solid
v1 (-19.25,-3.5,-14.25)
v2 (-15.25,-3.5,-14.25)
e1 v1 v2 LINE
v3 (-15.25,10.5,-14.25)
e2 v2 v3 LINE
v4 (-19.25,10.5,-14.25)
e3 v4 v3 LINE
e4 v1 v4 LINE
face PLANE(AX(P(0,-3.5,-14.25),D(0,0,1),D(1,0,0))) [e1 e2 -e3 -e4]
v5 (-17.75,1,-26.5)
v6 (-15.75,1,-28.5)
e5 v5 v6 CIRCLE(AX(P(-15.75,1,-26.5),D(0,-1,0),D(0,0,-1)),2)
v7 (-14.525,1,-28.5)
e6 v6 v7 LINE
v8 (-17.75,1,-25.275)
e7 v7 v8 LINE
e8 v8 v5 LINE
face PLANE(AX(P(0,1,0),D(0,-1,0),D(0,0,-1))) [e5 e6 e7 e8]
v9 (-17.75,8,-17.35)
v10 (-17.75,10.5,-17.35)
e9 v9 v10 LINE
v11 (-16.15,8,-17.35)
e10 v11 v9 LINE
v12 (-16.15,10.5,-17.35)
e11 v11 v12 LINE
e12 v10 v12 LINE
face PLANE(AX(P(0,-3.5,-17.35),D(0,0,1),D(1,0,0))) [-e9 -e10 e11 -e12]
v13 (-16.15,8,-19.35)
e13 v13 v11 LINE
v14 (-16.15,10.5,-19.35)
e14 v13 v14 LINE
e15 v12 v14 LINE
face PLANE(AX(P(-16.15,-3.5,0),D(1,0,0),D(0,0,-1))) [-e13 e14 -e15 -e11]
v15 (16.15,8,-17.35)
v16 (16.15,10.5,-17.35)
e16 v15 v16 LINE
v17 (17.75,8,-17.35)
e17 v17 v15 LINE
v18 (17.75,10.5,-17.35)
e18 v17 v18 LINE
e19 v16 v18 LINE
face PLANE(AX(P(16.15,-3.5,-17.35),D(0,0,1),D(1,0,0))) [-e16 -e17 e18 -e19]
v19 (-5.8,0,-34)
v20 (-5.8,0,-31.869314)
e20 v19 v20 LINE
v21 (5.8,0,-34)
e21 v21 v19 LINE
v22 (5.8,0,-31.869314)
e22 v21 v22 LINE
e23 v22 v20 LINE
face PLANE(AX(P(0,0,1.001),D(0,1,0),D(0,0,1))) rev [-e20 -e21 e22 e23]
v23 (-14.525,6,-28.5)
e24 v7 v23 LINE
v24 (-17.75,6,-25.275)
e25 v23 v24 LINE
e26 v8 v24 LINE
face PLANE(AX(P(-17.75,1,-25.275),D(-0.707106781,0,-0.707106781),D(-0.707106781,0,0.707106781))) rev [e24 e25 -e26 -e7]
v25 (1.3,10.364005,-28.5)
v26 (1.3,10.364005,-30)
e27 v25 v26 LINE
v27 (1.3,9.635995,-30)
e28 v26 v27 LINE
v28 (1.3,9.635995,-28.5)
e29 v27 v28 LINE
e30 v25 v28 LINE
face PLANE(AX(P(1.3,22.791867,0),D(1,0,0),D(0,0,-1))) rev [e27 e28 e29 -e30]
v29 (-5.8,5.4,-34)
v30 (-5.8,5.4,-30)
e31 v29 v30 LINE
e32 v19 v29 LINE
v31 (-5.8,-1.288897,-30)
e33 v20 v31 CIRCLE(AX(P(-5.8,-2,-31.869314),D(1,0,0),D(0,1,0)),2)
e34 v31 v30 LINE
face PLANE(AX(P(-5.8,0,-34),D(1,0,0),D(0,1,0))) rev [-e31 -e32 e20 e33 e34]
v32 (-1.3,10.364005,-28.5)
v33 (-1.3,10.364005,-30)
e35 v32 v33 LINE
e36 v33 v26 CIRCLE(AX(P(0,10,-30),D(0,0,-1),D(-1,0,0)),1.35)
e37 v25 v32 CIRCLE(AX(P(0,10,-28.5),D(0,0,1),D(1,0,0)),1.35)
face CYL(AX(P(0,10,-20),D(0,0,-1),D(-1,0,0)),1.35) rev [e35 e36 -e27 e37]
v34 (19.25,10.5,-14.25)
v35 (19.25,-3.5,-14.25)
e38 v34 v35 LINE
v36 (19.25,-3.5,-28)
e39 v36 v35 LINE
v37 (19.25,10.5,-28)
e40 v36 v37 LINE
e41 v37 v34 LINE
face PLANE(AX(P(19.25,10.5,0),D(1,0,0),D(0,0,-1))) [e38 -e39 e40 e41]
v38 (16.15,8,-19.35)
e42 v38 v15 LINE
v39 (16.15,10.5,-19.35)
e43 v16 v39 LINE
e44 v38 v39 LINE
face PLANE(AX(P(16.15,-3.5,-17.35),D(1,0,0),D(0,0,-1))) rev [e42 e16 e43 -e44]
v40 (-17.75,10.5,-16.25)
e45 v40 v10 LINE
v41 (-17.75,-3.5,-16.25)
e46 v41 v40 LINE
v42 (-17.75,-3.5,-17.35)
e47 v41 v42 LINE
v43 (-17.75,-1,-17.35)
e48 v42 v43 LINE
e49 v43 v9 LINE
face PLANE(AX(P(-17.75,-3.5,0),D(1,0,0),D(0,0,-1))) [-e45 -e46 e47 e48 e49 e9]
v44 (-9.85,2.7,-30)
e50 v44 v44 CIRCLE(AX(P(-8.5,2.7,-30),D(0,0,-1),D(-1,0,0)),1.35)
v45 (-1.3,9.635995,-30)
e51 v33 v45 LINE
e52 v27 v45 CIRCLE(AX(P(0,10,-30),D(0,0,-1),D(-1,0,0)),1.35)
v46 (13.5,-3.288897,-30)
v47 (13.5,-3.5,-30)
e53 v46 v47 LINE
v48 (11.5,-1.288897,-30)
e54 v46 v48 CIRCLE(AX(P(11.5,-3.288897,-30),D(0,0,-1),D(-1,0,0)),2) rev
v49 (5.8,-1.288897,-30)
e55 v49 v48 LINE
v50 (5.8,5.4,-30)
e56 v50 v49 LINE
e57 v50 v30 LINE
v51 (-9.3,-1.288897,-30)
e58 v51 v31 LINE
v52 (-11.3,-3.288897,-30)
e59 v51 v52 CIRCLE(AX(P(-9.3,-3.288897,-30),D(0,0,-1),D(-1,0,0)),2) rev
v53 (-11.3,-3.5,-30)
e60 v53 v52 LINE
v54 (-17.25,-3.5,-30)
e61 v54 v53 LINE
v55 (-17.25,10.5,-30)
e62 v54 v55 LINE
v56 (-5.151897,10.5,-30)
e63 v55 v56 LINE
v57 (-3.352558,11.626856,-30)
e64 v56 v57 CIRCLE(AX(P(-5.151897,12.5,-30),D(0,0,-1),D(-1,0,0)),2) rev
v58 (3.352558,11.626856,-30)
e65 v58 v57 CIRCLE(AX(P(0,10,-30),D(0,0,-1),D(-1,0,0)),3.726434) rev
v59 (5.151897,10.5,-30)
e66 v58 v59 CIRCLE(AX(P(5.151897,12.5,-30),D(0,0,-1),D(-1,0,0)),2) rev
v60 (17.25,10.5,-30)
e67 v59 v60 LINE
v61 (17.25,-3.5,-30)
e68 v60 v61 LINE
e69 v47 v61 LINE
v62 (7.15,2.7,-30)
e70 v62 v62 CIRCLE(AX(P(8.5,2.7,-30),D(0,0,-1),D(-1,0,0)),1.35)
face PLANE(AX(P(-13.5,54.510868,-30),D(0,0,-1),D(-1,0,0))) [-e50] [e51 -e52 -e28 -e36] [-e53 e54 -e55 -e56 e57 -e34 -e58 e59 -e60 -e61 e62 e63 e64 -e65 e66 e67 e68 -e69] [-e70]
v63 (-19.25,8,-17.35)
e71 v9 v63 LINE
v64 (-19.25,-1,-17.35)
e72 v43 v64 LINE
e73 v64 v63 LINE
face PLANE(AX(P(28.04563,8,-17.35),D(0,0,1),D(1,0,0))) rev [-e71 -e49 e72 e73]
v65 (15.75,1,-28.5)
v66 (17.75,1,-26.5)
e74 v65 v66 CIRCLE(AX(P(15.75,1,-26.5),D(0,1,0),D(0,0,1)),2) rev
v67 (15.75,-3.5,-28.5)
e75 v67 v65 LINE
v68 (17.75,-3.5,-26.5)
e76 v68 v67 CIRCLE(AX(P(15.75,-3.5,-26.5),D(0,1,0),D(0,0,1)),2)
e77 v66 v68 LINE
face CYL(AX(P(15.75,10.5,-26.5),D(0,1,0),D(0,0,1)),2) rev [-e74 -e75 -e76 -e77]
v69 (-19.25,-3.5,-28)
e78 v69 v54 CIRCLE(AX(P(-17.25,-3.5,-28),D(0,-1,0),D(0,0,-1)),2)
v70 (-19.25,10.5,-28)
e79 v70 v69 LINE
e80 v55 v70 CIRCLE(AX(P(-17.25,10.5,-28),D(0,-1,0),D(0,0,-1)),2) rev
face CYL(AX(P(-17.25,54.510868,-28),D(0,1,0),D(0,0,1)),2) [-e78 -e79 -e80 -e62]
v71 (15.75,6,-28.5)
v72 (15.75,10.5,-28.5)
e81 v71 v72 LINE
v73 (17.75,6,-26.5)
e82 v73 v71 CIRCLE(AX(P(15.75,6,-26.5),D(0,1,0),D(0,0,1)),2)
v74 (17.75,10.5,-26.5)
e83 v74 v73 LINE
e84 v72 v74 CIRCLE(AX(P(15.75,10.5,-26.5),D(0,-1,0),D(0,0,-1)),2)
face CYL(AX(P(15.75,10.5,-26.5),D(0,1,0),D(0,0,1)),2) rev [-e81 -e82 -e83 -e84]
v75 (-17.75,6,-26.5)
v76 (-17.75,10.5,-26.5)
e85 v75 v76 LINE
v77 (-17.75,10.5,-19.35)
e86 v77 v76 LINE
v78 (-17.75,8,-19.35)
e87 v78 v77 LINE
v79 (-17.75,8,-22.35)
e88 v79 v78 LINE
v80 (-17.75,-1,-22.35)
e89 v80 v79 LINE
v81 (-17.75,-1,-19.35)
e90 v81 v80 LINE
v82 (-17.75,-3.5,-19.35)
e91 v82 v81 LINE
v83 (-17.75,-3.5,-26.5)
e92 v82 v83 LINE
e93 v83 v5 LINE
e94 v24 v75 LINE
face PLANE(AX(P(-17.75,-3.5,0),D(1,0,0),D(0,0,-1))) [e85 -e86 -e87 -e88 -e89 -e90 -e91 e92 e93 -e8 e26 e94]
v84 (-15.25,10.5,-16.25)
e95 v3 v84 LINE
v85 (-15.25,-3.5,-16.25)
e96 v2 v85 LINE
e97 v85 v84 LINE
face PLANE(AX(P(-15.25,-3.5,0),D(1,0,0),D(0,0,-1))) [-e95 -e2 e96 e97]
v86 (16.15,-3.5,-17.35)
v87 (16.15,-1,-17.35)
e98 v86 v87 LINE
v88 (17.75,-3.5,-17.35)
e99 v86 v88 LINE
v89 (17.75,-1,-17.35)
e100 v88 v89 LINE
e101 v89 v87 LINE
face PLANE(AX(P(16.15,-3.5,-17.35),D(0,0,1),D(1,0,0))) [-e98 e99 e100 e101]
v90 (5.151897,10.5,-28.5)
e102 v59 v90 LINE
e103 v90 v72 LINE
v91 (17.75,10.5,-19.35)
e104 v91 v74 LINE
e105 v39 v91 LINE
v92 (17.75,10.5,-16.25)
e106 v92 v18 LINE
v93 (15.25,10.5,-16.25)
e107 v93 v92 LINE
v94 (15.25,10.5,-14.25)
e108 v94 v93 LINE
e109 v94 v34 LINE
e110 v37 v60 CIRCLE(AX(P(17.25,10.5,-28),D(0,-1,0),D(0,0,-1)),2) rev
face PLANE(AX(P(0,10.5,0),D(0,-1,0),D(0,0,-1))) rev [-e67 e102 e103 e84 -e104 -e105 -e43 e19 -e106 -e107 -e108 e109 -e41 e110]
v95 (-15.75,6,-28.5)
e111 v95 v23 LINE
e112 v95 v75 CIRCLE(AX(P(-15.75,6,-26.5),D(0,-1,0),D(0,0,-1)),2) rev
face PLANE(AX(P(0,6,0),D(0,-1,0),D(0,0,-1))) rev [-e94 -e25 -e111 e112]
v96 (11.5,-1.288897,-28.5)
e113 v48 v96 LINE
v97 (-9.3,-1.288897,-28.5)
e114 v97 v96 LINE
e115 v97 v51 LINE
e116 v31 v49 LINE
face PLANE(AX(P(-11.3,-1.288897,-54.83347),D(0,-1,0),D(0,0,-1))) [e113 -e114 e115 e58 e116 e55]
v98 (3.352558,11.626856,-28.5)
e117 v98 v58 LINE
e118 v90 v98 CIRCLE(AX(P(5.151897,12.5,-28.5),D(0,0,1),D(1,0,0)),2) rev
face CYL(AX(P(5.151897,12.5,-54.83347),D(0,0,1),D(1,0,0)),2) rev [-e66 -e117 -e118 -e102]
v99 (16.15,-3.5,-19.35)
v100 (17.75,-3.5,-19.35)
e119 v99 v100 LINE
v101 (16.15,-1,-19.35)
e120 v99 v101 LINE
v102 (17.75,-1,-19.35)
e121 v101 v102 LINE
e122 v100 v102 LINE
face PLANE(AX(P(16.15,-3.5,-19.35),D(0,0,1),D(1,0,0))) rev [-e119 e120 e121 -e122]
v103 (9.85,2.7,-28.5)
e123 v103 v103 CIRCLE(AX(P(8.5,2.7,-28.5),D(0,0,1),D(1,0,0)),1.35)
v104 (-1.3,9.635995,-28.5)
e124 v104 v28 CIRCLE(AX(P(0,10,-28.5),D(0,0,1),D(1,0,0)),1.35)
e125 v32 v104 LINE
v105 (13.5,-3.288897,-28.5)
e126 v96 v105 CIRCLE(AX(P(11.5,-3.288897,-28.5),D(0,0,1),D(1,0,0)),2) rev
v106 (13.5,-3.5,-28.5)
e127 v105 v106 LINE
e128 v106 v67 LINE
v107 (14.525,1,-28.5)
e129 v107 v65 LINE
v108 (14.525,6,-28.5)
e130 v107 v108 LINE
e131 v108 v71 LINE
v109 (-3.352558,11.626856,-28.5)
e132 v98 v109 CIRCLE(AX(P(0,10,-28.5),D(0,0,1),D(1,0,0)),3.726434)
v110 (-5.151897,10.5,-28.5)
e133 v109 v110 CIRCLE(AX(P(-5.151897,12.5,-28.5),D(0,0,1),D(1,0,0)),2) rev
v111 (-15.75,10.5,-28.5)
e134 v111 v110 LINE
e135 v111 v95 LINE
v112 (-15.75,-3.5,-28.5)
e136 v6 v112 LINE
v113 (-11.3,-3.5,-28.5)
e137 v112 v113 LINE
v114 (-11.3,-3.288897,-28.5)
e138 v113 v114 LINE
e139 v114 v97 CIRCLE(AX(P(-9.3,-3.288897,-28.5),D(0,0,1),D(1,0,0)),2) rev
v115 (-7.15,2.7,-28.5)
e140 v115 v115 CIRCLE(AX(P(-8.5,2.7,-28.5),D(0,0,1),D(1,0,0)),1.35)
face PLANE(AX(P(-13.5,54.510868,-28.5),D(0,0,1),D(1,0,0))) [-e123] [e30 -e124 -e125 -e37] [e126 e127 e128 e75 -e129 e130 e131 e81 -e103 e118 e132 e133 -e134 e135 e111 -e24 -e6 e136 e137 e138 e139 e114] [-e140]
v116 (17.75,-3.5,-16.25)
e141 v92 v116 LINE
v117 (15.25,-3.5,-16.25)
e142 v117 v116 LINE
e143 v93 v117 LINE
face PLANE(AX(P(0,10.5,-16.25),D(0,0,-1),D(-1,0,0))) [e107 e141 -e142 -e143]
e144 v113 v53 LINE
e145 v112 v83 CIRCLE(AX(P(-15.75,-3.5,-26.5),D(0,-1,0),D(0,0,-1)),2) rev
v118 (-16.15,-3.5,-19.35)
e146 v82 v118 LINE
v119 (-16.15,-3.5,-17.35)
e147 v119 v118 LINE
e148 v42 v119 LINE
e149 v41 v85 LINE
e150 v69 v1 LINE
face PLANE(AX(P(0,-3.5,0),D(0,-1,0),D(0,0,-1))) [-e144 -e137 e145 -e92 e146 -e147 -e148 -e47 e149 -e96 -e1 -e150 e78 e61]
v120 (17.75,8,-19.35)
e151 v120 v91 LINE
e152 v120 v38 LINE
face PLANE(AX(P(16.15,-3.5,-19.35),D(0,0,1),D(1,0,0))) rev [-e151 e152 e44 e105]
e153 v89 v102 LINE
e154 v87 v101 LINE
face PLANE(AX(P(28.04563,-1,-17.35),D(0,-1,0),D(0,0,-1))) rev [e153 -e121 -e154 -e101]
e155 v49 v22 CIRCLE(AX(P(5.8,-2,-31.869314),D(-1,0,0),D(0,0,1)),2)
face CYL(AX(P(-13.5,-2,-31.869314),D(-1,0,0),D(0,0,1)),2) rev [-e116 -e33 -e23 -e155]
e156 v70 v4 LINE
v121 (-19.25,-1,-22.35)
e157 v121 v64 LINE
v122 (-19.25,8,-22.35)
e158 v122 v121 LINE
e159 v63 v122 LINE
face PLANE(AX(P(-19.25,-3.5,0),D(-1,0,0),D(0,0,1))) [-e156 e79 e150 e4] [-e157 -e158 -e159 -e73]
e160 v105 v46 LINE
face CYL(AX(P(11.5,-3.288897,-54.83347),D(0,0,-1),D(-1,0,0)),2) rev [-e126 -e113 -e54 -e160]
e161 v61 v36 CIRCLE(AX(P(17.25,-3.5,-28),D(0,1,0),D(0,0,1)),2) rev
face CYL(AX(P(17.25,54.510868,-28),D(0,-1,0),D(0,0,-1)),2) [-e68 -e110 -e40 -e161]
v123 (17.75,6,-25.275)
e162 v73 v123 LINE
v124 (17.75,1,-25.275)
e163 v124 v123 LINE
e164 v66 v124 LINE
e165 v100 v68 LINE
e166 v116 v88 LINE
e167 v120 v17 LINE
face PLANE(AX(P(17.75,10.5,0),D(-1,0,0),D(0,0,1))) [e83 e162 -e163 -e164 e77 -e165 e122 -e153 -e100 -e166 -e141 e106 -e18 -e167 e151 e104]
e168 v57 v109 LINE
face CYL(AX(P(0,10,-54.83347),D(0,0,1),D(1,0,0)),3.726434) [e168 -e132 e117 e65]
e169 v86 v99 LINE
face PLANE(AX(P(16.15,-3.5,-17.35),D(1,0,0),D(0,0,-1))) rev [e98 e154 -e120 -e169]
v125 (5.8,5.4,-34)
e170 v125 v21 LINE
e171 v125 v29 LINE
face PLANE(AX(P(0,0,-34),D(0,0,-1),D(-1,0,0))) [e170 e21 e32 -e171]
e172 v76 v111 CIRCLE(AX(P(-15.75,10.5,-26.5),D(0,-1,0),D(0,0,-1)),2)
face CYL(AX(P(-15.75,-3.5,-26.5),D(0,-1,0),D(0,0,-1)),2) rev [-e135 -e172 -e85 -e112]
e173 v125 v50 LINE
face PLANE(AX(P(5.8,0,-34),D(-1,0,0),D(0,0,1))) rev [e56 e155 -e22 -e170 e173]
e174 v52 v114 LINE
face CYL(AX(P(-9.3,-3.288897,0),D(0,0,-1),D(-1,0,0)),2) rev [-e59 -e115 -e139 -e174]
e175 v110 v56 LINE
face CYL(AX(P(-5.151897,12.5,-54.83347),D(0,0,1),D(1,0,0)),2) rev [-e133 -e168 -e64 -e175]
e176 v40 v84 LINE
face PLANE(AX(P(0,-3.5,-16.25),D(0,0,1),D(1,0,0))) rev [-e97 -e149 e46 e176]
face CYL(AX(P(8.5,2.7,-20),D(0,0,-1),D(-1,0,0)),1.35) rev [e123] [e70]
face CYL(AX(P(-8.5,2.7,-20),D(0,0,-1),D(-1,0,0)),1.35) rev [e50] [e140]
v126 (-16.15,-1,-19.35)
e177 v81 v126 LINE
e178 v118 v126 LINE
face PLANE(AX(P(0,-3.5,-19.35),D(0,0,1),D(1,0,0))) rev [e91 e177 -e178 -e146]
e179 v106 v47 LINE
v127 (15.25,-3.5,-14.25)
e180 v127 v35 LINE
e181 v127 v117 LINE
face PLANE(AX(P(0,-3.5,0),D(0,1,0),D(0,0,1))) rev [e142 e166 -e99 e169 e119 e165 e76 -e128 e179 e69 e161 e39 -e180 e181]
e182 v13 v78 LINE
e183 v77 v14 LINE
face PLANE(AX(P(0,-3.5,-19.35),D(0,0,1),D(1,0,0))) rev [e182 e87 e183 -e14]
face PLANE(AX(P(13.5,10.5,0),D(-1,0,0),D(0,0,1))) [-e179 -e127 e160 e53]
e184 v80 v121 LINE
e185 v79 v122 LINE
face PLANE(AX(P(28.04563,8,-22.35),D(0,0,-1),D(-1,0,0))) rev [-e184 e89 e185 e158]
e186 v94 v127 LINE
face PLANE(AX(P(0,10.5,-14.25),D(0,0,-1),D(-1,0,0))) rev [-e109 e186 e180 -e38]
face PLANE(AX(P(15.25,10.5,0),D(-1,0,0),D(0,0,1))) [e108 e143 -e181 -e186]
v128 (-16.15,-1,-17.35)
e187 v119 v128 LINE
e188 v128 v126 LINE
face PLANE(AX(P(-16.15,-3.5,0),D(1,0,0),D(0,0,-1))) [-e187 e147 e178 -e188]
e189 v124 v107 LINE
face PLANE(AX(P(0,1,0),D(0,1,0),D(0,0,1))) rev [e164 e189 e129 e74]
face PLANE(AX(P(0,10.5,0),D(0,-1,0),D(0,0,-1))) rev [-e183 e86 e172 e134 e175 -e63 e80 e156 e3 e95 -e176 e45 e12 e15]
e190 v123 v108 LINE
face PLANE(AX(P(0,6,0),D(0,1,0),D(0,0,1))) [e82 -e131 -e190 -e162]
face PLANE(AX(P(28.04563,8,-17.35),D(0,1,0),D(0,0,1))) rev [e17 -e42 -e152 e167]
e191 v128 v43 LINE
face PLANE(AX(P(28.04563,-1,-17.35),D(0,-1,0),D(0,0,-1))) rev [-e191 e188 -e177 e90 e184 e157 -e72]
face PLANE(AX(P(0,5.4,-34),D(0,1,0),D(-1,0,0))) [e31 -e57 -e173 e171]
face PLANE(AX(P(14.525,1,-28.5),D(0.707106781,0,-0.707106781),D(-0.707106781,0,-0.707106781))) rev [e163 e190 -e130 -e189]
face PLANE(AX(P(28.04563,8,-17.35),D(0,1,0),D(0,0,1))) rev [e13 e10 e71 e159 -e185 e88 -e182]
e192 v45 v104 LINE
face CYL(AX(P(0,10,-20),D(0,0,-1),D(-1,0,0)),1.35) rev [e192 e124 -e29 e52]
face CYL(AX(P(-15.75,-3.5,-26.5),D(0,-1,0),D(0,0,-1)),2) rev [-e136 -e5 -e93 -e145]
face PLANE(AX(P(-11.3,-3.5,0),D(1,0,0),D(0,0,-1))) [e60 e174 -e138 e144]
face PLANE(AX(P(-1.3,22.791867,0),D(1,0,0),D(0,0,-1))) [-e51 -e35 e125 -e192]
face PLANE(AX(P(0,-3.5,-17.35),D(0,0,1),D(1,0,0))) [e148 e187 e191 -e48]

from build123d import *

# Parameters (mm, degrees)
SKETCH_1_W               = 27
SKETCH_1_H               = 17
EXTRUDE_1_DEPTH          = 1
SKETCH_2_R               = 2.55
CUT_EXTRUDE_1_DEPTH      = 16.984367363
EXTRUDE_2_DEPTH          = 17
SKETCH_6_W               = 1.5
SKETCH_6_H               = 2
EXTRUDE_3_DEPTH          = 2
CHAMFER_1_SIZE           = 1
CUT_EXTRUDE_4_REACH      = 39.316
SKETCH_8_R               = 2
FILLET_1_R               = 3
SKETCH_9_W               = 7
SKETCH_9_H               = 13
EXTRUDE_4_DEPTH          = 1.5
SKETCH_7_R               = 1.35
CUT_EXTRUDE_5_DEPTH      = 10
CUT_EXTRUDE_6_REACH      = 41.373
FILLET_2_R               = 2.2
SKETCH_13_W              = 11.6
SKETCH_13_H              = 5.4
EXTRUDE_6_DEPTH          = 4
CUT_EXTRUDE_7_DEPTH      = 44.188540186
CUT_EXTRUDE_7_DEPTH_BACK = 44.188540186
SKETCH_14_OUTSIDE_W      = 46.664
SKETCH_14_OUTSIDE_H      = 47.664
SKETCH_14_OUTSIDE_W_2    = 27
SKETCH_14_OUTSIDE_H_2    = 5.5
EXTRUDE_7_DEPTH          = 3.5
EXTRUDE_7_DEPTH_BACK     = 10.5
SKETCH_16_W              = 5.6
SKETCH_16_H              = 1.5
SKETCH_16_W_2            = 4.4
SKETCH_16_W_3            = 12.2
EXTRUDE_8_DEPTH          = 2
EXTRUDE_9_DEPTH          = 2.5
CUT_EXTRUDE_8_REACH      = 54.983
SKETCH_18_W              = 5
SKETCH_18_H              = 9
EXTRUDE_START            = -1.5
SKETCH_19_R              = 3.726433752
SKETCH_19_R_2            = 1.35
SKETCH_19_W              = 24.8
SKETCH_19_H              = 1.288897449
EXTRUDE_10_DEPTH         = 1.5
FILLET_4_R               = 2


# Some blends are built 0.0001 mm under size
with BuildPart() as part:
    # 草图1 → 凸台-拉伸1 (new body)
    with BuildSketch(Plane.XY):
        Rectangle(SKETCH_1_W, SKETCH_1_H)
    extrude(amount=EXTRUDE_1_DEPTH)

    # 草图2 → 切除-拉伸1 (cut, through all)
    with BuildSketch(Plane.XY.offset(1)):
        with Locations((0, 4.125)):
            Circle(SKETCH_2_R)
        with Locations((0, -4.125)):
            Circle(SKETCH_2_R)
        with Locations((8.27, 4.125)):
            Circle(SKETCH_2_R)
        with Locations((8.27, -4.125)):
            Circle(SKETCH_2_R)
        with Locations((-8.27, 4.125)):
            Circle(SKETCH_2_R)
        with Locations((-8.27, -4.125)):
            Circle(SKETCH_2_R)
    extrude(amount=-CUT_EXTRUDE_1_DEPTH, mode=Mode.SUBTRACT)

    # 草图3 → 凸台-拉伸2 (add)
    with BuildSketch(Plane.XZ.offset(8.5)):
        Polygon((13.5, 0), (19, 0), (19, -28.5), (-13.5, -28.5), (-13.5, -30), (20.5, -30), (20.5, 1), (13.5, 1), align=None)
    extrude(amount=-EXTRUDE_2_DEPTH)

    # 草图6 → 凸台-拉伸3 (add, symmetric)
    with BuildSketch(Plane(origin=(0, 0, 0), x_dir=(1, 0, 0), z_dir=(0, 1, 0))):
        Polygon((19, 0), (19, 5), (14, 0), align=None)
        Polygon((19, 28.5), (14, 28.5), (19, 23.5), align=None)
        with Locations((18.25, 20)):
            Rectangle(SKETCH_6_W, SKETCH_6_H)
    extrude(amount=EXTRUDE_3_DEPTH, both=True)

    # 倒角1
    chamfer_1_edges = [part.edges().sort_by_distance(p)[0] for p in [
        (-13.5, 0, 0),
    ]]
    chamfer(chamfer_1_edges, length=CHAMFER_1_SIZE - 0.0001)  # a hair under: the kernel refuses the full size

    # 草图8 → 切除-拉伸4 (cut, up to next)
    with BuildSketch(Plane(origin=(0, 0, 0), x_dir=(-1, 0, 0), z_dir=(0, 0, -1)), mode=Mode.PRIVATE) as cut_extrude_4_sk1:
        Circle(SKETCH_8_R)
    cut_extrude_4_tool1 = extrude(cut_extrude_4_sk1.sketch, amount=-CUT_EXTRUDE_4_REACH, mode=Mode.PRIVATE) & part.part
    add(cut_extrude_4_tool1.solids().sort_by_distance((0, 0, 0))[0], mode=Mode.SUBTRACT)

    # 圆角1
    fillet_1_edges = [part.edges().sort_by_distance(p)[0] for p in [
        (20.5, 0, 1),
        (20.5, 0, -30),
        (19, 5.25, -28.5),
        (19, 5.25, 0),
        (19, -5.25, 0),
        (19, -5.25, -28.5),
    ]]
    fillet(fillet_1_edges, radius=FILLET_1_R)

    # 草图9 → 凸台-拉伸4 (add)
    with BuildSketch(Plane(origin=(0, 0, -30), x_dir=(-1, 0, 0), z_dir=(0, 0, -1))):
        with Locations((0, 6.5)):
            Rectangle(SKETCH_9_W, SKETCH_9_H)
    extrude(amount=-EXTRUDE_4_DEPTH)

    # 草图7 → 切除-拉伸5 (cut)
    with BuildSketch(Plane(origin=(0, 0, -30), x_dir=(-1, 0, 0), z_dir=(0, 0, -1))):
        with Locations((0, 10)):
            Circle(SKETCH_7_R)
        with Locations((-8.5, 2.7)):
            Circle(SKETCH_7_R)
        with Locations((8.5, 2.7)):
            Circle(SKETCH_7_R)
    extrude(amount=-CUT_EXTRUDE_5_DEPTH, mode=Mode.SUBTRACT)

    # 草图11 → 切除-拉伸6 (cut, up to next)
    with BuildSketch(Plane(origin=(0, 0, -30), x_dir=(-1, 0, 0), z_dir=(0, 0, -1)), mode=Mode.PRIVATE) as cut_extrude_6_sk1:
        with BuildLine():
            Line((13.5, -8.5), (13.5, 0))
            Line((13.5, 0), (-9, 0))
            ThreePointArc((-9, 0), (-15.01040764, -2.48959236), (-17.5, -8.5))
            Line((-17.5, -8.5), (13.5, -8.5))
        make_face()
    cut_extrude_6_tool1 = extrude(cut_extrude_6_sk1.sketch, amount=-CUT_EXTRUDE_6_REACH, mode=Mode.PRIVATE) & part.part
    add(cut_extrude_6_tool1.solids().sort_by_distance((1.149624, -4.397011, -30))[0], mode=Mode.SUBTRACT)

    # 圆角2
    fillet_2_edges = [part.edges().sort_by_distance(p)[0] for p in [
        (-3.5, 13, -29.25),
        (-3.5, 8.5, -29.25),
        (3.5, 13, -29.25),
        (3.5, 8.5, -29.25),
        (-13.5, 0, -29.25),
        (-13.5, 8.5, -29.25),
    ]]
    fillet(fillet_2_edges, radius=FILLET_2_R)

    # 草图13 → 凸台-拉伸6 (add)
    with BuildSketch(Plane(origin=(0, 0, -30), x_dir=(-1, 0, 0), z_dir=(0, 0, -1))):
        with Locations((0, 2.7)):
            Rectangle(SKETCH_13_W, SKETCH_13_H)
    extrude(amount=EXTRUDE_6_DEPTH)

    # 草图14 outside → 切除-拉伸7 (cut, two sides: drawn at the far end of the back side and taken through both)
    with BuildSketch(Plane(origin=(0, 8.5, 0), x_dir=(1, 0, 0), z_dir=(0, 1, 0)).offset(-CUT_EXTRUDE_7_DEPTH_BACK)):
        with Locations((3.5, 16.5)):
            Rectangle(SKETCH_14_OUTSIDE_W, SKETCH_14_OUTSIDE_H)
        with Locations((0, 31.25)):
            Rectangle(SKETCH_14_OUTSIDE_W_2, SKETCH_14_OUTSIDE_H_2, mode=Mode.SUBTRACT)
    extrude(amount=CUT_EXTRUDE_7_DEPTH + CUT_EXTRUDE_7_DEPTH_BACK, mode=Mode.SUBTRACT)

    # 草图15 → 凸台-拉伸7 (add, two sides: drawn at the far end of the back side and taken through both)
    with BuildSketch(Plane.XZ.offset(-EXTRUDE_7_DEPTH_BACK)):
        Polygon((-19.25, -14.25), (-19.25, -30), (-11.3, -30), (-11.3, -28.5), (-17.75, -28.5), (-17.75, -19.35), (-16.15, -19.35), (-16.15, -17.35), (-17.75, -17.35), (-17.75, -16.25), (-15.25, -16.25), (-15.25, -14.25), align=None)
        Polygon((17.75, -28.5), (13.5, -28.5), (13.5, -30), (19.25, -30), (19.25, -14.25), (15.25, -14.25), (15.25, -16.25), (17.75, -16.25), (17.75, -17.35), (16.15, -17.35), (16.15, -19.35), (17.75, -19.35), align=None)
    extrude(amount=EXTRUDE_7_DEPTH + EXTRUDE_7_DEPTH_BACK)

    # 草图16 → 凸台-拉伸8 (add)
    with BuildSketch(Plane(origin=(0, 8.5, 0), x_dir=(1, 0, 0), z_dir=(0, 1, 0))):
        with Locations((-8.5, 29.25)):
            Rectangle(SKETCH_16_W, SKETCH_16_H)
        with Locations((-3.5, 29.25)):
            Rectangle(SKETCH_16_W_2, SKETCH_16_H)
        with Locations((7.4, 29.25)):
            Rectangle(SKETCH_16_W_3, SKETCH_16_H)
    extrude(amount=EXTRUDE_8_DEPTH)

    # 草图17 → 凸台-拉伸9 (add, symmetric)
    with BuildSketch(Plane(origin=(0, 3.5, 0), x_dir=(-1, 0, 0), z_dir=(0, -1, 0))):
        Polygon((17.75, 25.275), (14.525, 28.5), (17.75, 28.5), align=None)
        Polygon((-17.75, 25.275), (-17.75, 28.5), (-14.525, 28.5), align=None)
    extrude(amount=EXTRUDE_9_DEPTH, both=True)

    # 切除-拉伸8: up to this face of the body (flat: up to its plane)
    cut_extrude_8_end = Plane(part.part.faces().sort_by_distance((17.75, 3.5, -16.8))[0])
    # 草图18 → 切除-拉伸8 (cut, up to the picked face)
    with BuildSketch(Plane.ZY.offset(19.25), mode=Mode.PRIVATE) as cut_extrude_8_sk1:
        with Locations((-19.85, 3.5)):
            Rectangle(SKETCH_18_W, SKETCH_18_H)
    cut_extrude_8_tool1 = split(extrude(cut_extrude_8_sk1.sketch, amount=-CUT_EXTRUDE_8_REACH, mode=Mode.PRIVATE), bisect_by=cut_extrude_8_end, keep=Keep.BOTH, mode=Mode.PRIVATE)
    add(cut_extrude_8_tool1.solids().sort_by(Axis((-19.25, 3.5, -19.85), (1, 0, 0)))[0], mode=Mode.SUBTRACT)

    # 草图19 → 凸台-拉伸10 (add)
    # profile 1 of 2: a face of its own
    with BuildSketch(Plane.XY.offset(-28.5).offset(EXTRUDE_START)):
        with Locations((0, 10)):
            Circle(SKETCH_19_R)
        with Locations((0, 10)):
            Circle(SKETCH_19_R_2, mode=Mode.SUBTRACT)
    # profile 2 of 2: a face of its own
    with BuildSketch(Plane.XY.offset(-28.5).offset(EXTRUDE_START)):
        with Locations((1.1, -0.644448725)):
            Rectangle(SKETCH_19_W, SKETCH_19_H)
    extrude(amount=EXTRUDE_10_DEPTH)

    # 圆角4
    # the kernel refuses this fillet: 2 mm, written as the material it adds along each edge
    with BuildSketch(Plane(origin=(13.5, -1.288897449, -28.5), x_dir=(0, -1, 0), z_dir=(0, 0, -1))) as fillet_4_piece_1:
        with BuildLine():
            CenterArc((FILLET_4_R, FILLET_4_R), FILLET_4_R, 180, 90)
            Line((0, FILLET_4_R), (0, 0))
            Line((0, 0), (FILLET_4_R, 0))
        make_face()
    extrude(amount=1.5)
    with BuildSketch(Plane(origin=(17.75, 1, -28.5), x_dir=(-1, 0, 0), z_dir=(0, 1, 0)), Plane(origin=(-17.75, 6, -28.5), x_dir=(1, 0, 0), z_dir=(0, -1, 0)), Plane(origin=(-17.75, 10.5, -28.5), x_dir=(1, 0, 0), z_dir=(0, -1, 0)), Plane(origin=(17.75, -3.5, -28.5), x_dir=(-1, 0, 0), z_dir=(0, 1, 0))) as fillet_4_piece_2:
        with BuildLine():
            CenterArc((FILLET_4_R, FILLET_4_R), FILLET_4_R, 180, 90)
            Line((0, FILLET_4_R), (0, 0))
            Line((0, 0), (FILLET_4_R, 0))
        make_face()
    extrude(amount=9.5)
    with BuildSketch(Plane(origin=(-3.692737265, 10.5, -28.5), x_dir=(-1, 0, 0), z_dir=(0, 0, -1))) as fillet_4_piece_3:
        with BuildLine():
            CenterArc((1.459159814, 2), FILLET_4_R, 205.88535786, 64.11464214)
            ThreePointArc((-0.340178937, 1.126856222), (-0.125315404, 0.576944648), (0, 0))
            Line((0, 0), (1.459159814, 0))
        make_face()
    extrude(amount=1.5)
    with BuildSketch(Plane(origin=(3.692737265, 10.5, -28.5), x_dir=(-0.28900142054358374, 0.9573286681823493, 0), z_dir=(0, 0, -1))) as fillet_4_piece_4:
        with BuildLine():
            CenterArc((1.492958077, 1.974898363), FILLET_4_R, 196.798181975, 64.11464214)
            Line((-0.421699259, 1.396895522), (0, 0))
            ThreePointArc((0, 0), (0.588541981, 0.046769794), (1.177083962, 0))
        make_face()
    extrude(amount=1.5)
    with BuildSketch(Plane(origin=(-5.8, 0, -30), x_dir=(0, -1, 0), z_dir=(1, 0, 0))) as fillet_4_piece_5:
        with BuildLine():
            CenterArc((2, 1.869313554), FILLET_4_R, 180, 69.172765444)
            Line((0, 1.869313554), (0, 0))
            Line((0, 0), (1.288897449, 0))
        make_face()
    extrude(amount=11.6)
    with BuildSketch(Plane(origin=(-11.3, -1.288897449, -30), x_dir=(1, 0, 0), z_dir=(0, 0, 1))) as fillet_4_piece_6:
        with BuildLine():
            CenterArc((FILLET_4_R, -FILLET_4_R), FILLET_4_R, 90, 90)
            Line((0, -FILLET_4_R), (0, 0))
            Line((0, 0), (FILLET_4_R, 0))
        make_face()
    extrude(amount=1.5)
    # the kernel refuses this fillet: 2 mm, written as the material it takes off along each edge
    with BuildSketch(Plane(origin=(19.25, 15.5, -30), x_dir=(-1, 0, 0), z_dir=(0, -1, 0))) as fillet_4_2_piece_1:
        with BuildLine():
            CenterArc((FILLET_4_R, -FILLET_4_R), FILLET_4_R, 90, 90)
            Line((0, -FILLET_4_R), (0, 0))
            Line((0, 0), (FILLET_4_R, 0))
        make_face()
    extrude(amount=24, mode=Mode.SUBTRACT)
    with BuildSketch(Plane(origin=(-19.25, 15.5, -30), x_dir=(1, 0, 0), z_dir=(0, -1, 0))) as fillet_4_2_piece_2:
        with BuildLine():
            CenterArc((FILLET_4_R, FILLET_4_R), FILLET_4_R, 180, 90)
            Line((0, FILLET_4_R), (0, 0))
            Line((0, 0), (FILLET_4_R, 0))
        make_face()
    extrude(amount=24, mode=Mode.SUBTRACT)


solid = part.part
